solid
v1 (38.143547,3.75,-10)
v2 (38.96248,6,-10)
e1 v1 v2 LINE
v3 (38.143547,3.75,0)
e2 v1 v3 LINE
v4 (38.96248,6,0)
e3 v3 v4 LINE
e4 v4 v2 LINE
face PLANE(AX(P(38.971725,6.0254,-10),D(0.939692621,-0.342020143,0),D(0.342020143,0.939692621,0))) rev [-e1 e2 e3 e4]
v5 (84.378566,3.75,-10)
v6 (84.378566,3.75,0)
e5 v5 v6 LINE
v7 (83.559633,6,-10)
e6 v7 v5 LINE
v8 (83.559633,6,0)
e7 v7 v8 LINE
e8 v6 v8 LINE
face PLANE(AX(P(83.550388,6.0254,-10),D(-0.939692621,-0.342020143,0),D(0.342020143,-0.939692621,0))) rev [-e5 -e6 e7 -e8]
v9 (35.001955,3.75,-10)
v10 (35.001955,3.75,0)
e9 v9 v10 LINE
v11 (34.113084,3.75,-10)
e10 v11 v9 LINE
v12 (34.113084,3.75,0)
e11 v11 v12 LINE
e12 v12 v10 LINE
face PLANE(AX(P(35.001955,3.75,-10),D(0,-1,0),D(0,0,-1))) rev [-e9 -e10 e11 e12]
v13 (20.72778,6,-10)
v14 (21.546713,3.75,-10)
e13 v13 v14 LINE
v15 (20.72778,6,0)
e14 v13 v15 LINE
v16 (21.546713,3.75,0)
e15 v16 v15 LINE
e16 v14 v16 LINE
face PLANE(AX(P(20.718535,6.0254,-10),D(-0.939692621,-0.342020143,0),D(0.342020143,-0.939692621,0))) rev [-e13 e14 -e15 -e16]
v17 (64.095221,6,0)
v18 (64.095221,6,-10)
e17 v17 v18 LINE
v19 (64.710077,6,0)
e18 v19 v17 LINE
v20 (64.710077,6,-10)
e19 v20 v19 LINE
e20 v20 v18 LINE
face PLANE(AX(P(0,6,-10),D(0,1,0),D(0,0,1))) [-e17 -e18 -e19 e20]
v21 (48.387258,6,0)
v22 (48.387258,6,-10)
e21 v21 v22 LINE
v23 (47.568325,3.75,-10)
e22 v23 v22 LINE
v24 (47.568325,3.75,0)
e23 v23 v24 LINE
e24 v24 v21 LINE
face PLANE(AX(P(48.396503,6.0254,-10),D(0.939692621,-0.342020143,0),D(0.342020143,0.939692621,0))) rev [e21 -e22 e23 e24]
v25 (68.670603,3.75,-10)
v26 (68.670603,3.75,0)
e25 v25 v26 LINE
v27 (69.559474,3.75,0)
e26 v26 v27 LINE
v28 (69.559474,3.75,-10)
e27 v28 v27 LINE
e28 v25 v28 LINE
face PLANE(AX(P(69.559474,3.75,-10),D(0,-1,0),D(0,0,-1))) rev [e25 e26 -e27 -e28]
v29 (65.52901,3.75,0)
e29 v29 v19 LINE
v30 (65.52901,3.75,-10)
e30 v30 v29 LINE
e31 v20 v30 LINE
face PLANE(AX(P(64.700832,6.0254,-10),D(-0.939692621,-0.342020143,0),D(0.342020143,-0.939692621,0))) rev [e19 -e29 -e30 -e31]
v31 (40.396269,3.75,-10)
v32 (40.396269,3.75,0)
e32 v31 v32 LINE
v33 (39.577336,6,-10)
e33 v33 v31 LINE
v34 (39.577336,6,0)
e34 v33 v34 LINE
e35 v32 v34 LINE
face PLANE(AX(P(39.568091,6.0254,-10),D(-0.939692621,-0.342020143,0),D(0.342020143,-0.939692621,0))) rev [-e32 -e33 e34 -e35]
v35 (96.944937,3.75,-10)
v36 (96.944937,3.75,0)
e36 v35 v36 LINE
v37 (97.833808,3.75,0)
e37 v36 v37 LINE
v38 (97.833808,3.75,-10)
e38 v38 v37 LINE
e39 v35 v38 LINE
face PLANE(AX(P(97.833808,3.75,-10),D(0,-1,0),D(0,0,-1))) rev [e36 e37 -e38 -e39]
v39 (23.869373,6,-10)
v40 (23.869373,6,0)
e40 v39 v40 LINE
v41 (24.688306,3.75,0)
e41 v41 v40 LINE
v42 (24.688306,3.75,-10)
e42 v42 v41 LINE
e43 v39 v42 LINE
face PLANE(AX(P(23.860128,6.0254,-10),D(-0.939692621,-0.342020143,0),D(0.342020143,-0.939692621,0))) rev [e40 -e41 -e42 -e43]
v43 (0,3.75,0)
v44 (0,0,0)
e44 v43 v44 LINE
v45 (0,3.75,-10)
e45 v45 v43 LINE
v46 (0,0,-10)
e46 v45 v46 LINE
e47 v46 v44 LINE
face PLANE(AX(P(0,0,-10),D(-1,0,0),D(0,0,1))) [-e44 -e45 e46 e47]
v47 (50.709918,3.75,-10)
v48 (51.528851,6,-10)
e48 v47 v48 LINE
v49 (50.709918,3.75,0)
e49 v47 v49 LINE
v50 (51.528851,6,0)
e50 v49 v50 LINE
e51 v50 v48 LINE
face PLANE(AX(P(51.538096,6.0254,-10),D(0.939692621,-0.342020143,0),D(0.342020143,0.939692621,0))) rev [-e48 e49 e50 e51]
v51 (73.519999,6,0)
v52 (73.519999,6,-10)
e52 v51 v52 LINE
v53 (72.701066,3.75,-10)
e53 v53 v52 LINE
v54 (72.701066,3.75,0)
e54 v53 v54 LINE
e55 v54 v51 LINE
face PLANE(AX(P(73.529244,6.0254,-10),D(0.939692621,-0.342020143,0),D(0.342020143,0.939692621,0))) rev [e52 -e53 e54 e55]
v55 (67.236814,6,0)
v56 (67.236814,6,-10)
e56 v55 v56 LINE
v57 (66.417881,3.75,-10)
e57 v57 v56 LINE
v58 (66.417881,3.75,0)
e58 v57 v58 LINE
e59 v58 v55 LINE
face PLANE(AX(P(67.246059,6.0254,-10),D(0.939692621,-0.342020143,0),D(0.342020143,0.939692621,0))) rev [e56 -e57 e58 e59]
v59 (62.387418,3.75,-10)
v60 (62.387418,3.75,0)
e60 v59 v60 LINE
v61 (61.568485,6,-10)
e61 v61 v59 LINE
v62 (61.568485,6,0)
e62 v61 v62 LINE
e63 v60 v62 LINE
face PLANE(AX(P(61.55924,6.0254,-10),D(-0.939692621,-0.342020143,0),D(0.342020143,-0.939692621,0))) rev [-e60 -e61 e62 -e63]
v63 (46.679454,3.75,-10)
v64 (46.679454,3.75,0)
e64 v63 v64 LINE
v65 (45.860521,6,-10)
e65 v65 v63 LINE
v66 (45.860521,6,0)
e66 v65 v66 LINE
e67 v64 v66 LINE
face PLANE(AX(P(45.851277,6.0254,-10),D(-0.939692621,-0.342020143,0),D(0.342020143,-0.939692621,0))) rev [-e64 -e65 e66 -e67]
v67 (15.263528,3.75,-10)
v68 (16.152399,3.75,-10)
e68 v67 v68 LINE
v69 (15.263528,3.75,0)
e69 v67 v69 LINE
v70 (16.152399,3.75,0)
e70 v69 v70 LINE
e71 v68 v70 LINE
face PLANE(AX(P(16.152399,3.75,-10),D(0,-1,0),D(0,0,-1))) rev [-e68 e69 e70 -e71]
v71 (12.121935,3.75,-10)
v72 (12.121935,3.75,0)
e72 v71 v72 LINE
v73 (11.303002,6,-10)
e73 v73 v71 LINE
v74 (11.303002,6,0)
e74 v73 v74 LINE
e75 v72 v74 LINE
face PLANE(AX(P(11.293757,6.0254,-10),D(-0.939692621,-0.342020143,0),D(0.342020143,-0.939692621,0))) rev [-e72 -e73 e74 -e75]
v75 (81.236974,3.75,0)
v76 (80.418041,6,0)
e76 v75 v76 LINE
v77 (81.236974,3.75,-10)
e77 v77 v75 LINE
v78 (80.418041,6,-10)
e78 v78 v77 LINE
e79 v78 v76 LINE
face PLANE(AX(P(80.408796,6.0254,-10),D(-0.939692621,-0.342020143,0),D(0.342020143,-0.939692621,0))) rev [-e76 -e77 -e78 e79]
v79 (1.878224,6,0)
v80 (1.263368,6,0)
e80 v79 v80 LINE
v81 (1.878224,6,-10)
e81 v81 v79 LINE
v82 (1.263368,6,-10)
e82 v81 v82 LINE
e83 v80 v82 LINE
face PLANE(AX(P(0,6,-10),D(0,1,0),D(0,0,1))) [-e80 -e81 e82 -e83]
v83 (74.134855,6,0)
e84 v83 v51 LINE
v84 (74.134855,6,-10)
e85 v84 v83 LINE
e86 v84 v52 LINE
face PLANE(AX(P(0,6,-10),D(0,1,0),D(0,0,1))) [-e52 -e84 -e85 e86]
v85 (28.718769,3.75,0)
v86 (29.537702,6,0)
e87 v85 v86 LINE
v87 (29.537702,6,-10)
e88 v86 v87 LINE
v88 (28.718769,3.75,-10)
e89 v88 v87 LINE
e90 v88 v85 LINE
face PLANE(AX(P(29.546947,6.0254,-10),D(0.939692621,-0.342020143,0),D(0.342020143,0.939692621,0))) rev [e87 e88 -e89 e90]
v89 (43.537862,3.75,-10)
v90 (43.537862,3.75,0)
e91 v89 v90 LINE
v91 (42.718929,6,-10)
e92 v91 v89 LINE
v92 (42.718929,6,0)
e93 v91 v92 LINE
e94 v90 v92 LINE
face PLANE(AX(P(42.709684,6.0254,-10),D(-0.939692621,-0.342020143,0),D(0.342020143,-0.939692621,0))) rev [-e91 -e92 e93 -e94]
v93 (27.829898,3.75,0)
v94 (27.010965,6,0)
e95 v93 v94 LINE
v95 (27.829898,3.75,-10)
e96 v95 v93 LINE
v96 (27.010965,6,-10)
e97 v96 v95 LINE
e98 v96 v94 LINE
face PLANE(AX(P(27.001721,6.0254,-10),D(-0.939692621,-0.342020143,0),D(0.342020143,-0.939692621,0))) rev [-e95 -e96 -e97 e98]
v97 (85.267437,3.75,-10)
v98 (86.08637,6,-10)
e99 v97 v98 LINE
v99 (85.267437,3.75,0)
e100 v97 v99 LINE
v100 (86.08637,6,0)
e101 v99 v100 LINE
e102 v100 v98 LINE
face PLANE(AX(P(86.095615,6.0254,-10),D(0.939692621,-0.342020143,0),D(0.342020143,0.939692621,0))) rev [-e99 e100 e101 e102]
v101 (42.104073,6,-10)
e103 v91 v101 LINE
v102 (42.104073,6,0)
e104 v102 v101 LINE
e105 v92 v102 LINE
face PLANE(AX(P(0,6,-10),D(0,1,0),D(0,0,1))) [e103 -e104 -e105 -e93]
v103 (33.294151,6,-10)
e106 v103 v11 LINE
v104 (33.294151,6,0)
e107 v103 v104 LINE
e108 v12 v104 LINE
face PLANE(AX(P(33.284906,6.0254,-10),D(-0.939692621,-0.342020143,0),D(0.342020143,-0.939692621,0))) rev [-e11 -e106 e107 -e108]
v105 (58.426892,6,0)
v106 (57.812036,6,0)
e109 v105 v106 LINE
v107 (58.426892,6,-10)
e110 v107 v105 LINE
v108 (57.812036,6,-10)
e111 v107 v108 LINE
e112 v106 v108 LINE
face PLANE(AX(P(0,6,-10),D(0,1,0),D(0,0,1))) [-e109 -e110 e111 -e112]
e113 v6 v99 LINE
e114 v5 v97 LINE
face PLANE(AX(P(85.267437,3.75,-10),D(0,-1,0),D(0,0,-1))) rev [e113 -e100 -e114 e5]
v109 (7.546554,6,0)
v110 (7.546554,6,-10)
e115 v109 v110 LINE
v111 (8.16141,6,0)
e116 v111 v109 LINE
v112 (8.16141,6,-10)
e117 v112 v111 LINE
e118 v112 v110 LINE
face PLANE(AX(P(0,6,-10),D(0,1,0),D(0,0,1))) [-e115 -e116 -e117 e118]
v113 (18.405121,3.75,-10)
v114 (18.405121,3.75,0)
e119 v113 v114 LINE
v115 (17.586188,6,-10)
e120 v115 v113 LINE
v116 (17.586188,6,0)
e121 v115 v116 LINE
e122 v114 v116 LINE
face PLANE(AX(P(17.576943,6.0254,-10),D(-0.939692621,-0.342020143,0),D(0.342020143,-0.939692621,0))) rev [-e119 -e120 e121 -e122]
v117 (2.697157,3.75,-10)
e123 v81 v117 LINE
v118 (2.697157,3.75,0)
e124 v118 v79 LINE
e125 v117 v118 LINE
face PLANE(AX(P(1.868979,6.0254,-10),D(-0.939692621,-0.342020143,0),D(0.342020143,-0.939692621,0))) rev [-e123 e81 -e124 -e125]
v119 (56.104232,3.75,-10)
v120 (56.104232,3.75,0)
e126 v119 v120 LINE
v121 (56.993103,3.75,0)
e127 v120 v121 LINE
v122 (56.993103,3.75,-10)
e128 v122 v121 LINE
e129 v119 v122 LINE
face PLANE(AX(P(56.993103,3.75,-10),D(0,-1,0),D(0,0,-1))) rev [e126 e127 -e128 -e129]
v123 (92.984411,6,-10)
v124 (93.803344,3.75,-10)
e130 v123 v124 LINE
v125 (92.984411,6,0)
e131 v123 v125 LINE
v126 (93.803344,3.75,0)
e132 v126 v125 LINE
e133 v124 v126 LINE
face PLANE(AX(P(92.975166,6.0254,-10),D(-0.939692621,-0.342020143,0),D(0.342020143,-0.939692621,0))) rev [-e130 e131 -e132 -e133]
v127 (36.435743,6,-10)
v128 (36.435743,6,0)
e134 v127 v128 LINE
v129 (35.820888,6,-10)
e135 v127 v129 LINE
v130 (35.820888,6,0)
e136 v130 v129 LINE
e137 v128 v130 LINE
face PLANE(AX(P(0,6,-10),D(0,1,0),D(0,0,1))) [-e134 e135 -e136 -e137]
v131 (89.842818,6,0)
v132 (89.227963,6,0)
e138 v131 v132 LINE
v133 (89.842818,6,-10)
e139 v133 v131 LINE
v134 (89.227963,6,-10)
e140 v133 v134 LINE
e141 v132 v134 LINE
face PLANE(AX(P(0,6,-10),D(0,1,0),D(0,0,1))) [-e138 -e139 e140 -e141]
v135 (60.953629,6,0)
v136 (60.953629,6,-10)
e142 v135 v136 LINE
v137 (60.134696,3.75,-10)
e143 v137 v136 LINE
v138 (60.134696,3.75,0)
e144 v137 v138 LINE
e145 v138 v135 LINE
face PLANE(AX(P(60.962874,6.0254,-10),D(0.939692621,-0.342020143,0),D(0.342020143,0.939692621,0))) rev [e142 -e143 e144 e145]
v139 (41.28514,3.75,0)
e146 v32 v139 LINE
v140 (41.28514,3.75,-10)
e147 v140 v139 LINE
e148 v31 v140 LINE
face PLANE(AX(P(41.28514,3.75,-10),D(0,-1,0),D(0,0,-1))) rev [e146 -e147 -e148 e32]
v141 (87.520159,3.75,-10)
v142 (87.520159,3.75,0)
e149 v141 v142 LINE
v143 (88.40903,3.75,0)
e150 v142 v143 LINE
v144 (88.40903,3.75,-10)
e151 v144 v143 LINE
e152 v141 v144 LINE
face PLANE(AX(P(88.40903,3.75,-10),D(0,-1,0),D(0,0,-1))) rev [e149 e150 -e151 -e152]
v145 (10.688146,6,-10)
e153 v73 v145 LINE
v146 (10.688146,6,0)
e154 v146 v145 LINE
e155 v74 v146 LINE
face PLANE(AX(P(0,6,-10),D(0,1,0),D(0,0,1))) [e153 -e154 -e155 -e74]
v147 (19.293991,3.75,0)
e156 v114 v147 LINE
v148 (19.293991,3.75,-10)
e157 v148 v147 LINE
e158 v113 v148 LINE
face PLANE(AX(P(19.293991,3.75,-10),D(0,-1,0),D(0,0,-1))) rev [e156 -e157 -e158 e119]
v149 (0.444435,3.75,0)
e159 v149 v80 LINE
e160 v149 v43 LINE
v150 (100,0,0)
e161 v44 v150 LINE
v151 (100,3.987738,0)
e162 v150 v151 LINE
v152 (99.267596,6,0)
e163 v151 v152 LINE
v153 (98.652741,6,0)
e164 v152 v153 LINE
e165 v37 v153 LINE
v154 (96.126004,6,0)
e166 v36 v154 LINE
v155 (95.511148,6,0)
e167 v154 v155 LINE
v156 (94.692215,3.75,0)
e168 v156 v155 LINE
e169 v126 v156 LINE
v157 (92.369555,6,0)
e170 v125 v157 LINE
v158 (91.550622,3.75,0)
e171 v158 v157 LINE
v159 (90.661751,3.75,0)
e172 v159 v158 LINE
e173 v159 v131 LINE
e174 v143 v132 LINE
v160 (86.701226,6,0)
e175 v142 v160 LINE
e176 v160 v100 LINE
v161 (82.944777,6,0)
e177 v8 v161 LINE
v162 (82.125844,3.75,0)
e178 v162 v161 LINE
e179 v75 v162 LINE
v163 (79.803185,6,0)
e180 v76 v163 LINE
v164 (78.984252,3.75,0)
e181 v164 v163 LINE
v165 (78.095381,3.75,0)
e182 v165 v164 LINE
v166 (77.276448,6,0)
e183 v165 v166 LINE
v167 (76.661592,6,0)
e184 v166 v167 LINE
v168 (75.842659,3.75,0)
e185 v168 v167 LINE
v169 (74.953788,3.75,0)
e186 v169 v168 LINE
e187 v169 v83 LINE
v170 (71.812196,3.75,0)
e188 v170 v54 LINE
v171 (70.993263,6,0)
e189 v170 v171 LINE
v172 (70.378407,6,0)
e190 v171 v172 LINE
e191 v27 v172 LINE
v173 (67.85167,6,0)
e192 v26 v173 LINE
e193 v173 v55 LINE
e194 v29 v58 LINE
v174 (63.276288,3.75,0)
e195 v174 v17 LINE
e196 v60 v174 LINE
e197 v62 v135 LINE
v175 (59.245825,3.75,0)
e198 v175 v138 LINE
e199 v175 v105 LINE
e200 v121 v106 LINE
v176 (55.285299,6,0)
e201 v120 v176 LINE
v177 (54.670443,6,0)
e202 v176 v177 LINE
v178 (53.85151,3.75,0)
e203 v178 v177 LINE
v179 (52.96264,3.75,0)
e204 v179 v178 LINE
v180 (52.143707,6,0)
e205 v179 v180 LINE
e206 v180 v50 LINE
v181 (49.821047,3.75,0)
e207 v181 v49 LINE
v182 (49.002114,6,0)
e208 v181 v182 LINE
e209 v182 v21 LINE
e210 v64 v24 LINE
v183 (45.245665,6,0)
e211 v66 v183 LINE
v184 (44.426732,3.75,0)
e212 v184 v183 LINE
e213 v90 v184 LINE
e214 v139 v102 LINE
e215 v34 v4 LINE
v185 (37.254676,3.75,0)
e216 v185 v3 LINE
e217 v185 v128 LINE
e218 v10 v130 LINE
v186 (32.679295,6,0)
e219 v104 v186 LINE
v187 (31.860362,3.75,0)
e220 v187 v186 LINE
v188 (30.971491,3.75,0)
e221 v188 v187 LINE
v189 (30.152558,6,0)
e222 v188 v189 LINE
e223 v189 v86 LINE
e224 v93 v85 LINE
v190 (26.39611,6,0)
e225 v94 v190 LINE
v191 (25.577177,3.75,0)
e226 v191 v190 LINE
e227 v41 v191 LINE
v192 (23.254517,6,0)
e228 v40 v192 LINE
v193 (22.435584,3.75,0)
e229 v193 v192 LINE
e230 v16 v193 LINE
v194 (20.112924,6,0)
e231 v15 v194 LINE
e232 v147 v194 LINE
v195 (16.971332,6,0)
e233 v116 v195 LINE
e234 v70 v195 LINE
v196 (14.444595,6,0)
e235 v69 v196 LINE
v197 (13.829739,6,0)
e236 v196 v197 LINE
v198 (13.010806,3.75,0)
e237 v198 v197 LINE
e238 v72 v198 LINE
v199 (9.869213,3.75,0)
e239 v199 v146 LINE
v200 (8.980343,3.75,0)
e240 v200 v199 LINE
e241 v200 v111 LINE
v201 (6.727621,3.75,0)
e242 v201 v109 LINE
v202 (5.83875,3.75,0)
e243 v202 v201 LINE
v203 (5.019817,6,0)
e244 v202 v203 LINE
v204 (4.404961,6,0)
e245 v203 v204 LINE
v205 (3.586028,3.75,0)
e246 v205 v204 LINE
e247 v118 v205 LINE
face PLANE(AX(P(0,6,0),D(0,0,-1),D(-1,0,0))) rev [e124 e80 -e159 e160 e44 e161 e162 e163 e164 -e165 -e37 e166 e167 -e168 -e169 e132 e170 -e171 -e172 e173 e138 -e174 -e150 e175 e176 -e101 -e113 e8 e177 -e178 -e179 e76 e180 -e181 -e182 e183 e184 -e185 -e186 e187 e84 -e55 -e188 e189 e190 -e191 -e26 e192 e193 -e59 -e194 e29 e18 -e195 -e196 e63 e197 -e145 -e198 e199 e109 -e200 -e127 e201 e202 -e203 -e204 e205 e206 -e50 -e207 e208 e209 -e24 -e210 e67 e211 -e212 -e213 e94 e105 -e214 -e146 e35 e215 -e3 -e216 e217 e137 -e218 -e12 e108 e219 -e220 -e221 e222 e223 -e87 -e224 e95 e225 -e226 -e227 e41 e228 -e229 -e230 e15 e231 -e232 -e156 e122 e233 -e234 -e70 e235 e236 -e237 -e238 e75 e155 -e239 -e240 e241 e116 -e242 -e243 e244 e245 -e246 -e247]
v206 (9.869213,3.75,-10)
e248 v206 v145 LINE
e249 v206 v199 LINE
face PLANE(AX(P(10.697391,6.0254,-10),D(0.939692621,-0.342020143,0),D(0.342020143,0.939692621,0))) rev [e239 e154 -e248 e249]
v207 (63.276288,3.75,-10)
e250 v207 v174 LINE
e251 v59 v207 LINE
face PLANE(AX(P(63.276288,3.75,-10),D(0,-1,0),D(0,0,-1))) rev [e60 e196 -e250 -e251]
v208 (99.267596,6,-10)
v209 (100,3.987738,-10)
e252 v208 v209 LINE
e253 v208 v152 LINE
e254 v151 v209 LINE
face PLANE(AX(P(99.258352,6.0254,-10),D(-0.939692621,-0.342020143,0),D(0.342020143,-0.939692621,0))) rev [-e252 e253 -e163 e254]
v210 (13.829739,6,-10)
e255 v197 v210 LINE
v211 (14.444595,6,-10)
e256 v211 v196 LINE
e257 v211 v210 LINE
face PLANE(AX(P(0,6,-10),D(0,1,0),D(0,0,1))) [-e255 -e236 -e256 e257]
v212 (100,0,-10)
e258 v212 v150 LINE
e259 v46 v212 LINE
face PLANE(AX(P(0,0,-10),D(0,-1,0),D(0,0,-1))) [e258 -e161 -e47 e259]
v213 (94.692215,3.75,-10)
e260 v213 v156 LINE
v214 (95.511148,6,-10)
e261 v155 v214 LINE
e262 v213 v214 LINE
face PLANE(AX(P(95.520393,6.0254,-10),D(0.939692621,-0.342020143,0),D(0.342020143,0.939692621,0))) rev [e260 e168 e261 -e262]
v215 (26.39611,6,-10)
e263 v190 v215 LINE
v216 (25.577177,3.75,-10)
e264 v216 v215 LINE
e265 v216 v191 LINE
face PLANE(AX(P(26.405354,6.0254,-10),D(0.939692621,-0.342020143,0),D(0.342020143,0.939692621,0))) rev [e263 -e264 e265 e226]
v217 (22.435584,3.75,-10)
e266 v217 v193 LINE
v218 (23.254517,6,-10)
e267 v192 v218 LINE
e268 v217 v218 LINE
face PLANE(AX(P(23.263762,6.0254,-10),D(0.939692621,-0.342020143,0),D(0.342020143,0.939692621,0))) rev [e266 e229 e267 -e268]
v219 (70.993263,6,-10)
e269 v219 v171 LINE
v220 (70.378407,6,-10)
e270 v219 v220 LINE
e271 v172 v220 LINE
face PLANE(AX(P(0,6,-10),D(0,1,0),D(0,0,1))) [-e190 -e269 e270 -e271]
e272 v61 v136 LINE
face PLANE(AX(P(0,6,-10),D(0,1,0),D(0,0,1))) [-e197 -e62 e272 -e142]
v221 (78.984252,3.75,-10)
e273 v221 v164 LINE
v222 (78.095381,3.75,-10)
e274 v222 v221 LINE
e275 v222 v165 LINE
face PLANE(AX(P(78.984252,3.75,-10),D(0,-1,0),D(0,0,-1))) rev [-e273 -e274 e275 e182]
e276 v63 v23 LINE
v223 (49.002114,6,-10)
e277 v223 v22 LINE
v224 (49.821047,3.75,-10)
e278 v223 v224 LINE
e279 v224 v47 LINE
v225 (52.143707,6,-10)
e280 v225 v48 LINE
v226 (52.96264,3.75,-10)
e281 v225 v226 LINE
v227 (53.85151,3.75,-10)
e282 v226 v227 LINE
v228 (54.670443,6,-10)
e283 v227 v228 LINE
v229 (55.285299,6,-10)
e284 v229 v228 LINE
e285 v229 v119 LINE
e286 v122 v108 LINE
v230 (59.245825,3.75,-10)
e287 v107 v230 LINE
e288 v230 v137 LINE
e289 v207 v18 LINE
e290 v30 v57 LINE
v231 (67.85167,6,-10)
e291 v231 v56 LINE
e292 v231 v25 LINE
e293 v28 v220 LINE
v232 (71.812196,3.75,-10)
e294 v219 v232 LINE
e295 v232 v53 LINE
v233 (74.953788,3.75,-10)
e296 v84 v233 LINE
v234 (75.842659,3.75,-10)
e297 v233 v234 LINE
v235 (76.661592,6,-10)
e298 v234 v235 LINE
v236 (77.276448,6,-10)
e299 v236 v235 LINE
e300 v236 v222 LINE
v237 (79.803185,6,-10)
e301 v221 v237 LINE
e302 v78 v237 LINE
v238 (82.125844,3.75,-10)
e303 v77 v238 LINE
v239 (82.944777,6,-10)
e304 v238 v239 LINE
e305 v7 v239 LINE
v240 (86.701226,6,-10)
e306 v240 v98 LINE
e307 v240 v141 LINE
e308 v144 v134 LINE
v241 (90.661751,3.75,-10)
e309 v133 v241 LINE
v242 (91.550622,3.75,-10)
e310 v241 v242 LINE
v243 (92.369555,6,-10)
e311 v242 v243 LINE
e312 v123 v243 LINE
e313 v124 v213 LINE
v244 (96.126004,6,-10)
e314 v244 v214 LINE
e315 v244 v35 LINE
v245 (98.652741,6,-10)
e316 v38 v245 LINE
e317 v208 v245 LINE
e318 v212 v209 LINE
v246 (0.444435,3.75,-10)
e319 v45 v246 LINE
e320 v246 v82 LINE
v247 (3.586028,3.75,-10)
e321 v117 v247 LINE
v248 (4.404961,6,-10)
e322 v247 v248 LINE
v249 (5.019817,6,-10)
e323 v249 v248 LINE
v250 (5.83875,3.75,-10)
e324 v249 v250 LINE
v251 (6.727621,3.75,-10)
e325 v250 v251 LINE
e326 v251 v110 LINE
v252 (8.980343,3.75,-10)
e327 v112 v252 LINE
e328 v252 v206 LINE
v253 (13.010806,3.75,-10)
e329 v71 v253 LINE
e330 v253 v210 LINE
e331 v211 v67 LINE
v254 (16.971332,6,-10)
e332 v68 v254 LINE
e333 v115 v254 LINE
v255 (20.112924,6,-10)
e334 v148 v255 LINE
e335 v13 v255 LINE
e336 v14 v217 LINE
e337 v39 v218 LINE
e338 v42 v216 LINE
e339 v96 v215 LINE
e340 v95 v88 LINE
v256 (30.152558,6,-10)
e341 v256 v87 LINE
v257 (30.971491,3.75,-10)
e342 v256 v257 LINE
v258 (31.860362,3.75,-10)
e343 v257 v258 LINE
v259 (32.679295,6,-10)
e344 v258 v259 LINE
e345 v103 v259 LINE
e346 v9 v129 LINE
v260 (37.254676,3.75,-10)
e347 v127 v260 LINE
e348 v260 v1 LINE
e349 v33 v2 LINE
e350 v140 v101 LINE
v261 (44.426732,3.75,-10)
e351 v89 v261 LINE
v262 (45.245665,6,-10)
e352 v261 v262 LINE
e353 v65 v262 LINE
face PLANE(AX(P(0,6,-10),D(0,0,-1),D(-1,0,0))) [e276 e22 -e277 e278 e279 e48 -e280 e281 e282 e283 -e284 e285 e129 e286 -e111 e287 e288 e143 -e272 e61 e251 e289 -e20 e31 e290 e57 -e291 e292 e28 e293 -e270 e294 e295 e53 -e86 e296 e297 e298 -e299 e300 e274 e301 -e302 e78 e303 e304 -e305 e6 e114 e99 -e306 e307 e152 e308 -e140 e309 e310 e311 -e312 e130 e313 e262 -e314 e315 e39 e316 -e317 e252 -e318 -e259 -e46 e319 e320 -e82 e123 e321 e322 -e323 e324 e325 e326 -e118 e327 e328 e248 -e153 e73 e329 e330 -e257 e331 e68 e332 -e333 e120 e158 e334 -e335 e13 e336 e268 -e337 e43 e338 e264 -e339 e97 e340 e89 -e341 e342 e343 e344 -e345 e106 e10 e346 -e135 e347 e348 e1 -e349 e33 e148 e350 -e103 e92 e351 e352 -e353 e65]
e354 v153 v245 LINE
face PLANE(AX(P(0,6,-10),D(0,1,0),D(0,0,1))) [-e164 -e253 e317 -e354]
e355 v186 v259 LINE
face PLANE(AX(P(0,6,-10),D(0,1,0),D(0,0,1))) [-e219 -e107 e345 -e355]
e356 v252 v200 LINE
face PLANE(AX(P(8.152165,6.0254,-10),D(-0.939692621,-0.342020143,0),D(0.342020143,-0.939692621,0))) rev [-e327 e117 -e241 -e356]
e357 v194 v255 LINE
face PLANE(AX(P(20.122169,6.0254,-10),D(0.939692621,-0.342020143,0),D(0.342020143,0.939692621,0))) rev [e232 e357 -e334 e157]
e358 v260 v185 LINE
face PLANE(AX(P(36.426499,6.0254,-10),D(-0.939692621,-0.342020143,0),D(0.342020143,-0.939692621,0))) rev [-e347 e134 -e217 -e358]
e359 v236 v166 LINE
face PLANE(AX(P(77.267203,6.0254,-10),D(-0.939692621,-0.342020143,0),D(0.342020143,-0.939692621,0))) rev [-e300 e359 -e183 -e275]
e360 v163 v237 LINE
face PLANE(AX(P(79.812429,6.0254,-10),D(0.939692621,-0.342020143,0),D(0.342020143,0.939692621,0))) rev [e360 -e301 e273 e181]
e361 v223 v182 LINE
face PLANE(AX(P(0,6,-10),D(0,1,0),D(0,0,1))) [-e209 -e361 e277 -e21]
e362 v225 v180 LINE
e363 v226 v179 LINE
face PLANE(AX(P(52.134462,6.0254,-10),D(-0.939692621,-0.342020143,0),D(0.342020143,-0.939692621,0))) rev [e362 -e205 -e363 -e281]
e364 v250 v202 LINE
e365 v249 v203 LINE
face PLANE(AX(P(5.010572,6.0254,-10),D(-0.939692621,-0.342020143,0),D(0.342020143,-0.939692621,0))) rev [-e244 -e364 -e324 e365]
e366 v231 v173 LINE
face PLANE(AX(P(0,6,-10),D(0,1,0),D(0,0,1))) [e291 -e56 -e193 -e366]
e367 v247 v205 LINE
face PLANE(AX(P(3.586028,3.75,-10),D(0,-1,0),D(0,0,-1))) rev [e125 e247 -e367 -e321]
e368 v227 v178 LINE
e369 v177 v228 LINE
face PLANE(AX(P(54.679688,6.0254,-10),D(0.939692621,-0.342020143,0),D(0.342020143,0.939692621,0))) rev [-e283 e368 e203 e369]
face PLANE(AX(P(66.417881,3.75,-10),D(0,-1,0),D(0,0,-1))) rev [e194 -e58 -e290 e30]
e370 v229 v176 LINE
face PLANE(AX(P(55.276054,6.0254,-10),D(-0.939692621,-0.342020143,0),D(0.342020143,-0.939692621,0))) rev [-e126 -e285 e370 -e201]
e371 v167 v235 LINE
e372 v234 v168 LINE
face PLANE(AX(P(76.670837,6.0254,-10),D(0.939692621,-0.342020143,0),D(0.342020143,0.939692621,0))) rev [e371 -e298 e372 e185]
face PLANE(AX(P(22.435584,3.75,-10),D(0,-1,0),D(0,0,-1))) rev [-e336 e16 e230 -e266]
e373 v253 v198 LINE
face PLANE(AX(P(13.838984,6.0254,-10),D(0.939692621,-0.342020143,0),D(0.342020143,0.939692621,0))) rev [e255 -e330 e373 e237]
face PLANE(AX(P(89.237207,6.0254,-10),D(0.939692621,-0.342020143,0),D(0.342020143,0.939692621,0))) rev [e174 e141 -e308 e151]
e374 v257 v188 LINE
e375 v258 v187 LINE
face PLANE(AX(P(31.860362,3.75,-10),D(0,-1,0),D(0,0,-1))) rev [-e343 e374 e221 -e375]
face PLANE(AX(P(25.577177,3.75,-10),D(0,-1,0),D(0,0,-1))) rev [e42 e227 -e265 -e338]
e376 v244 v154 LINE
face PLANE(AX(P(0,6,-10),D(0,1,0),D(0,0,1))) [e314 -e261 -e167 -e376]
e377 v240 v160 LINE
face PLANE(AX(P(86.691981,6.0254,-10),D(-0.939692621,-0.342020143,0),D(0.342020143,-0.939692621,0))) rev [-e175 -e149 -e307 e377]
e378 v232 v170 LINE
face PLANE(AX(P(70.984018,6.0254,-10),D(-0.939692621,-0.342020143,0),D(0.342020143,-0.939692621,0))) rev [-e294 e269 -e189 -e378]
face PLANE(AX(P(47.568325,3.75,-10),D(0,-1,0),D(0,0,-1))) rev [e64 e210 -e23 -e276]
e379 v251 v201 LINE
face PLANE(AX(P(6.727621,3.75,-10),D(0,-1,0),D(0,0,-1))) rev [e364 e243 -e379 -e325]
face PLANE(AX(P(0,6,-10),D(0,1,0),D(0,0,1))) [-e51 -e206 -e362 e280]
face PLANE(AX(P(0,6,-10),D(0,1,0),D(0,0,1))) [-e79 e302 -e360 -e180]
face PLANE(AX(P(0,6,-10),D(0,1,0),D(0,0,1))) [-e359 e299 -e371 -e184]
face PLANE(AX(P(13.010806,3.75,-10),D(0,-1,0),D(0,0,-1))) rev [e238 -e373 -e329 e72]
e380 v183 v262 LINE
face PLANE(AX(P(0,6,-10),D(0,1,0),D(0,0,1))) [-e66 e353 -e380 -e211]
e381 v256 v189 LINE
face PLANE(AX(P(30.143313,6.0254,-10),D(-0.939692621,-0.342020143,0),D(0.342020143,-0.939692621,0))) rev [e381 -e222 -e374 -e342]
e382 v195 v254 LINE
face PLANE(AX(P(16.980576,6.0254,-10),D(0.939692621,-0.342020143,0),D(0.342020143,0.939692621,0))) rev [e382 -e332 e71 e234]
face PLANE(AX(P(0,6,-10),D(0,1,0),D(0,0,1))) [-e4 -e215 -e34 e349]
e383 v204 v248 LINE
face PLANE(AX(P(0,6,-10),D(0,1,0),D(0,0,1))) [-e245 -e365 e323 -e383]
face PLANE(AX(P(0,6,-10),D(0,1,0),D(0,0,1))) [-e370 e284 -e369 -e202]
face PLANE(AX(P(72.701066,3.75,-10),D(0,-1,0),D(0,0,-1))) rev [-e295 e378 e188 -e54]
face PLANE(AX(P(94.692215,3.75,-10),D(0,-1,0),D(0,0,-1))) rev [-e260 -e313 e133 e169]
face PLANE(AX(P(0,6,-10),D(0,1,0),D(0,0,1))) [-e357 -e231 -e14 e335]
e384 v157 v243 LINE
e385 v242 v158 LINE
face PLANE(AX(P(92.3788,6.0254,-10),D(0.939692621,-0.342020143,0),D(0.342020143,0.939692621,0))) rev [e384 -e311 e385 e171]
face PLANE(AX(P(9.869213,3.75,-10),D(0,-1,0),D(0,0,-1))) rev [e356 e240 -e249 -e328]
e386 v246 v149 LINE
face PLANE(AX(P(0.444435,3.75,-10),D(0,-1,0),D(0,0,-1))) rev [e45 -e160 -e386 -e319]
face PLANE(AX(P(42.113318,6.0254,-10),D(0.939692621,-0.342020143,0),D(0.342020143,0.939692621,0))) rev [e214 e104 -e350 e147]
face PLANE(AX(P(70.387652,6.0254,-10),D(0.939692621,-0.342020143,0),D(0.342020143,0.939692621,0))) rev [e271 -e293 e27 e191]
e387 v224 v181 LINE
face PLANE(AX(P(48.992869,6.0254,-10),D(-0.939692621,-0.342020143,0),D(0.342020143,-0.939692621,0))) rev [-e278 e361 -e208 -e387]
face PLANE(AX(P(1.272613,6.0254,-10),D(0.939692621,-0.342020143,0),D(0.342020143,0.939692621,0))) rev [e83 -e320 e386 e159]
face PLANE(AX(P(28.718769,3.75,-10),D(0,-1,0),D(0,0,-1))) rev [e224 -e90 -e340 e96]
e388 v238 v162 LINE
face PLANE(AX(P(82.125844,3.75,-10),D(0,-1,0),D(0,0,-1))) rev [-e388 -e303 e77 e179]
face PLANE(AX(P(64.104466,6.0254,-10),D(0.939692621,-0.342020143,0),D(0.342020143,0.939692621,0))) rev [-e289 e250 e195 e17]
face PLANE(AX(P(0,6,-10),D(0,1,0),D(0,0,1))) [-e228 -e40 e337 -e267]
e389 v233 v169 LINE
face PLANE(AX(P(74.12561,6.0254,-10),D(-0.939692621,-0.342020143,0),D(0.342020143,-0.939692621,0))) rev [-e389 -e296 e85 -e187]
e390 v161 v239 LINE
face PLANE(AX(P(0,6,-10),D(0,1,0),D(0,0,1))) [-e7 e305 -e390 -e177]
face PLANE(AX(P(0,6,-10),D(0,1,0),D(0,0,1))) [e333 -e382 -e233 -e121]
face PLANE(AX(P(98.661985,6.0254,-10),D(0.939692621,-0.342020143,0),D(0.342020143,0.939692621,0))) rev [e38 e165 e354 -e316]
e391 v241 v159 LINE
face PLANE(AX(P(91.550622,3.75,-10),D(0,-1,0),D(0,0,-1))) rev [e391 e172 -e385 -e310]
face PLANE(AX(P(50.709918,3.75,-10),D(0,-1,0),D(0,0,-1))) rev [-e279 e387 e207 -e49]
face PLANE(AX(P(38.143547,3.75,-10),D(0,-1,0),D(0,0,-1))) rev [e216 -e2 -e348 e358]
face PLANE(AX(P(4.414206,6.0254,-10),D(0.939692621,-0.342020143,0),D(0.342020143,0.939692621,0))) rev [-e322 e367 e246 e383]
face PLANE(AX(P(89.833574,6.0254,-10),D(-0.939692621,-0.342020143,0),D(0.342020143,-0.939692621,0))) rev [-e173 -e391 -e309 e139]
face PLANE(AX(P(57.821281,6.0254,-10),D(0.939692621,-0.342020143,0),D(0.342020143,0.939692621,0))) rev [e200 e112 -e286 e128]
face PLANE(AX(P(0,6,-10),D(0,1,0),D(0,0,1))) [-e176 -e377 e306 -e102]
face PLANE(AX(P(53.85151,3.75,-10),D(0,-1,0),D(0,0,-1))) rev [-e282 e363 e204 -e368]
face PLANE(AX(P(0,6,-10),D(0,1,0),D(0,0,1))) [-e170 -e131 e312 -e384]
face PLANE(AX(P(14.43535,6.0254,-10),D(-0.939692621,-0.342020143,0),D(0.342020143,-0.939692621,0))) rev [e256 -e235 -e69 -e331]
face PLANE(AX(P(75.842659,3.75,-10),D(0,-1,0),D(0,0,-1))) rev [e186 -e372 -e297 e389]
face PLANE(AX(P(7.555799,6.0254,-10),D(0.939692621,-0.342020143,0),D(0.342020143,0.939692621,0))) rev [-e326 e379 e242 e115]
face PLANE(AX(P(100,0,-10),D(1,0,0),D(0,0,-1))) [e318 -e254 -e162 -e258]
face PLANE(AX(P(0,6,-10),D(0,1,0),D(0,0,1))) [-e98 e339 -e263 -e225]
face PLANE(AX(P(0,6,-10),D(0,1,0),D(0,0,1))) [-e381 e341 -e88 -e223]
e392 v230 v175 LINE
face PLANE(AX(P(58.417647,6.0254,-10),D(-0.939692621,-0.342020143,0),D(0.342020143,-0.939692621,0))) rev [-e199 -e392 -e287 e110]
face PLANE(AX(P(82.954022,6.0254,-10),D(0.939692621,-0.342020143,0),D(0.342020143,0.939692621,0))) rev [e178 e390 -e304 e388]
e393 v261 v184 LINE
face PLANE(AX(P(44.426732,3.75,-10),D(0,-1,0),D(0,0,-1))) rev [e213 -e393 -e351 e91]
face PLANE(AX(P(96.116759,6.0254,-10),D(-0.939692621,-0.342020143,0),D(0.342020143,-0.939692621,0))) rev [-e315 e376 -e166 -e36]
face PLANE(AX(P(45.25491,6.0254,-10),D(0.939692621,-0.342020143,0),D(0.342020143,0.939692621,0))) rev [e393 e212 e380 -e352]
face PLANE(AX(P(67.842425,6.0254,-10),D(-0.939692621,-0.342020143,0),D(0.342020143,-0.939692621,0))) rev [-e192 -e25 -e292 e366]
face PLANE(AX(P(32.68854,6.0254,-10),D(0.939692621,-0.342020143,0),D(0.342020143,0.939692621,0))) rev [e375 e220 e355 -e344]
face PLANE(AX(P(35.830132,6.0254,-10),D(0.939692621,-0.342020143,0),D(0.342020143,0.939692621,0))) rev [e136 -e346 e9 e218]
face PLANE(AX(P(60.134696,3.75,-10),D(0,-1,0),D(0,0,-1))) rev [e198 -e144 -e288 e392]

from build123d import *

# Parameters (mm, degrees)
BLANKSKE_W        = 100
BLANKSKE_H        = 6
BLANK_DEPTH       = 10
TOOTHCUTSIM_DEPTH = 101.677703589
TEETHCUTS_COUNT   = 33
TEETHCUTS_PITCH   = 3.14159265


with BuildPart() as part:
    # BlankSke → Blank (new body)
    with BuildSketch(Plane.XY):
        with Locations((50, 3)):
            Rectangle(BLANKSKE_W, BLANKSKE_H)
    extrude(amount=-BLANK_DEPTH)

    # TooCutSkeSim → ToothCutSim (cut, through all)
    with BuildSketch(Plane.XY):
        Polygon((0.44443537, 3.75), (-0.44443537, 3.75), (-1.272613241, 6.0254), (1.272613241, 6.0254), align=None)
    toothcutsim = extrude(amount=-TOOTHCUTSIM_DEPTH, mode=Mode.SUBTRACT)

    # TeethCuts: ToothCutSim ×33
    with Locations(*[(i * TEETHCUTS_PITCH, 0, 0) for i in range(1, TEETHCUTS_COUNT)]):
        add(toothcutsim, mode=Mode.SUBTRACT)


solid = part.part
